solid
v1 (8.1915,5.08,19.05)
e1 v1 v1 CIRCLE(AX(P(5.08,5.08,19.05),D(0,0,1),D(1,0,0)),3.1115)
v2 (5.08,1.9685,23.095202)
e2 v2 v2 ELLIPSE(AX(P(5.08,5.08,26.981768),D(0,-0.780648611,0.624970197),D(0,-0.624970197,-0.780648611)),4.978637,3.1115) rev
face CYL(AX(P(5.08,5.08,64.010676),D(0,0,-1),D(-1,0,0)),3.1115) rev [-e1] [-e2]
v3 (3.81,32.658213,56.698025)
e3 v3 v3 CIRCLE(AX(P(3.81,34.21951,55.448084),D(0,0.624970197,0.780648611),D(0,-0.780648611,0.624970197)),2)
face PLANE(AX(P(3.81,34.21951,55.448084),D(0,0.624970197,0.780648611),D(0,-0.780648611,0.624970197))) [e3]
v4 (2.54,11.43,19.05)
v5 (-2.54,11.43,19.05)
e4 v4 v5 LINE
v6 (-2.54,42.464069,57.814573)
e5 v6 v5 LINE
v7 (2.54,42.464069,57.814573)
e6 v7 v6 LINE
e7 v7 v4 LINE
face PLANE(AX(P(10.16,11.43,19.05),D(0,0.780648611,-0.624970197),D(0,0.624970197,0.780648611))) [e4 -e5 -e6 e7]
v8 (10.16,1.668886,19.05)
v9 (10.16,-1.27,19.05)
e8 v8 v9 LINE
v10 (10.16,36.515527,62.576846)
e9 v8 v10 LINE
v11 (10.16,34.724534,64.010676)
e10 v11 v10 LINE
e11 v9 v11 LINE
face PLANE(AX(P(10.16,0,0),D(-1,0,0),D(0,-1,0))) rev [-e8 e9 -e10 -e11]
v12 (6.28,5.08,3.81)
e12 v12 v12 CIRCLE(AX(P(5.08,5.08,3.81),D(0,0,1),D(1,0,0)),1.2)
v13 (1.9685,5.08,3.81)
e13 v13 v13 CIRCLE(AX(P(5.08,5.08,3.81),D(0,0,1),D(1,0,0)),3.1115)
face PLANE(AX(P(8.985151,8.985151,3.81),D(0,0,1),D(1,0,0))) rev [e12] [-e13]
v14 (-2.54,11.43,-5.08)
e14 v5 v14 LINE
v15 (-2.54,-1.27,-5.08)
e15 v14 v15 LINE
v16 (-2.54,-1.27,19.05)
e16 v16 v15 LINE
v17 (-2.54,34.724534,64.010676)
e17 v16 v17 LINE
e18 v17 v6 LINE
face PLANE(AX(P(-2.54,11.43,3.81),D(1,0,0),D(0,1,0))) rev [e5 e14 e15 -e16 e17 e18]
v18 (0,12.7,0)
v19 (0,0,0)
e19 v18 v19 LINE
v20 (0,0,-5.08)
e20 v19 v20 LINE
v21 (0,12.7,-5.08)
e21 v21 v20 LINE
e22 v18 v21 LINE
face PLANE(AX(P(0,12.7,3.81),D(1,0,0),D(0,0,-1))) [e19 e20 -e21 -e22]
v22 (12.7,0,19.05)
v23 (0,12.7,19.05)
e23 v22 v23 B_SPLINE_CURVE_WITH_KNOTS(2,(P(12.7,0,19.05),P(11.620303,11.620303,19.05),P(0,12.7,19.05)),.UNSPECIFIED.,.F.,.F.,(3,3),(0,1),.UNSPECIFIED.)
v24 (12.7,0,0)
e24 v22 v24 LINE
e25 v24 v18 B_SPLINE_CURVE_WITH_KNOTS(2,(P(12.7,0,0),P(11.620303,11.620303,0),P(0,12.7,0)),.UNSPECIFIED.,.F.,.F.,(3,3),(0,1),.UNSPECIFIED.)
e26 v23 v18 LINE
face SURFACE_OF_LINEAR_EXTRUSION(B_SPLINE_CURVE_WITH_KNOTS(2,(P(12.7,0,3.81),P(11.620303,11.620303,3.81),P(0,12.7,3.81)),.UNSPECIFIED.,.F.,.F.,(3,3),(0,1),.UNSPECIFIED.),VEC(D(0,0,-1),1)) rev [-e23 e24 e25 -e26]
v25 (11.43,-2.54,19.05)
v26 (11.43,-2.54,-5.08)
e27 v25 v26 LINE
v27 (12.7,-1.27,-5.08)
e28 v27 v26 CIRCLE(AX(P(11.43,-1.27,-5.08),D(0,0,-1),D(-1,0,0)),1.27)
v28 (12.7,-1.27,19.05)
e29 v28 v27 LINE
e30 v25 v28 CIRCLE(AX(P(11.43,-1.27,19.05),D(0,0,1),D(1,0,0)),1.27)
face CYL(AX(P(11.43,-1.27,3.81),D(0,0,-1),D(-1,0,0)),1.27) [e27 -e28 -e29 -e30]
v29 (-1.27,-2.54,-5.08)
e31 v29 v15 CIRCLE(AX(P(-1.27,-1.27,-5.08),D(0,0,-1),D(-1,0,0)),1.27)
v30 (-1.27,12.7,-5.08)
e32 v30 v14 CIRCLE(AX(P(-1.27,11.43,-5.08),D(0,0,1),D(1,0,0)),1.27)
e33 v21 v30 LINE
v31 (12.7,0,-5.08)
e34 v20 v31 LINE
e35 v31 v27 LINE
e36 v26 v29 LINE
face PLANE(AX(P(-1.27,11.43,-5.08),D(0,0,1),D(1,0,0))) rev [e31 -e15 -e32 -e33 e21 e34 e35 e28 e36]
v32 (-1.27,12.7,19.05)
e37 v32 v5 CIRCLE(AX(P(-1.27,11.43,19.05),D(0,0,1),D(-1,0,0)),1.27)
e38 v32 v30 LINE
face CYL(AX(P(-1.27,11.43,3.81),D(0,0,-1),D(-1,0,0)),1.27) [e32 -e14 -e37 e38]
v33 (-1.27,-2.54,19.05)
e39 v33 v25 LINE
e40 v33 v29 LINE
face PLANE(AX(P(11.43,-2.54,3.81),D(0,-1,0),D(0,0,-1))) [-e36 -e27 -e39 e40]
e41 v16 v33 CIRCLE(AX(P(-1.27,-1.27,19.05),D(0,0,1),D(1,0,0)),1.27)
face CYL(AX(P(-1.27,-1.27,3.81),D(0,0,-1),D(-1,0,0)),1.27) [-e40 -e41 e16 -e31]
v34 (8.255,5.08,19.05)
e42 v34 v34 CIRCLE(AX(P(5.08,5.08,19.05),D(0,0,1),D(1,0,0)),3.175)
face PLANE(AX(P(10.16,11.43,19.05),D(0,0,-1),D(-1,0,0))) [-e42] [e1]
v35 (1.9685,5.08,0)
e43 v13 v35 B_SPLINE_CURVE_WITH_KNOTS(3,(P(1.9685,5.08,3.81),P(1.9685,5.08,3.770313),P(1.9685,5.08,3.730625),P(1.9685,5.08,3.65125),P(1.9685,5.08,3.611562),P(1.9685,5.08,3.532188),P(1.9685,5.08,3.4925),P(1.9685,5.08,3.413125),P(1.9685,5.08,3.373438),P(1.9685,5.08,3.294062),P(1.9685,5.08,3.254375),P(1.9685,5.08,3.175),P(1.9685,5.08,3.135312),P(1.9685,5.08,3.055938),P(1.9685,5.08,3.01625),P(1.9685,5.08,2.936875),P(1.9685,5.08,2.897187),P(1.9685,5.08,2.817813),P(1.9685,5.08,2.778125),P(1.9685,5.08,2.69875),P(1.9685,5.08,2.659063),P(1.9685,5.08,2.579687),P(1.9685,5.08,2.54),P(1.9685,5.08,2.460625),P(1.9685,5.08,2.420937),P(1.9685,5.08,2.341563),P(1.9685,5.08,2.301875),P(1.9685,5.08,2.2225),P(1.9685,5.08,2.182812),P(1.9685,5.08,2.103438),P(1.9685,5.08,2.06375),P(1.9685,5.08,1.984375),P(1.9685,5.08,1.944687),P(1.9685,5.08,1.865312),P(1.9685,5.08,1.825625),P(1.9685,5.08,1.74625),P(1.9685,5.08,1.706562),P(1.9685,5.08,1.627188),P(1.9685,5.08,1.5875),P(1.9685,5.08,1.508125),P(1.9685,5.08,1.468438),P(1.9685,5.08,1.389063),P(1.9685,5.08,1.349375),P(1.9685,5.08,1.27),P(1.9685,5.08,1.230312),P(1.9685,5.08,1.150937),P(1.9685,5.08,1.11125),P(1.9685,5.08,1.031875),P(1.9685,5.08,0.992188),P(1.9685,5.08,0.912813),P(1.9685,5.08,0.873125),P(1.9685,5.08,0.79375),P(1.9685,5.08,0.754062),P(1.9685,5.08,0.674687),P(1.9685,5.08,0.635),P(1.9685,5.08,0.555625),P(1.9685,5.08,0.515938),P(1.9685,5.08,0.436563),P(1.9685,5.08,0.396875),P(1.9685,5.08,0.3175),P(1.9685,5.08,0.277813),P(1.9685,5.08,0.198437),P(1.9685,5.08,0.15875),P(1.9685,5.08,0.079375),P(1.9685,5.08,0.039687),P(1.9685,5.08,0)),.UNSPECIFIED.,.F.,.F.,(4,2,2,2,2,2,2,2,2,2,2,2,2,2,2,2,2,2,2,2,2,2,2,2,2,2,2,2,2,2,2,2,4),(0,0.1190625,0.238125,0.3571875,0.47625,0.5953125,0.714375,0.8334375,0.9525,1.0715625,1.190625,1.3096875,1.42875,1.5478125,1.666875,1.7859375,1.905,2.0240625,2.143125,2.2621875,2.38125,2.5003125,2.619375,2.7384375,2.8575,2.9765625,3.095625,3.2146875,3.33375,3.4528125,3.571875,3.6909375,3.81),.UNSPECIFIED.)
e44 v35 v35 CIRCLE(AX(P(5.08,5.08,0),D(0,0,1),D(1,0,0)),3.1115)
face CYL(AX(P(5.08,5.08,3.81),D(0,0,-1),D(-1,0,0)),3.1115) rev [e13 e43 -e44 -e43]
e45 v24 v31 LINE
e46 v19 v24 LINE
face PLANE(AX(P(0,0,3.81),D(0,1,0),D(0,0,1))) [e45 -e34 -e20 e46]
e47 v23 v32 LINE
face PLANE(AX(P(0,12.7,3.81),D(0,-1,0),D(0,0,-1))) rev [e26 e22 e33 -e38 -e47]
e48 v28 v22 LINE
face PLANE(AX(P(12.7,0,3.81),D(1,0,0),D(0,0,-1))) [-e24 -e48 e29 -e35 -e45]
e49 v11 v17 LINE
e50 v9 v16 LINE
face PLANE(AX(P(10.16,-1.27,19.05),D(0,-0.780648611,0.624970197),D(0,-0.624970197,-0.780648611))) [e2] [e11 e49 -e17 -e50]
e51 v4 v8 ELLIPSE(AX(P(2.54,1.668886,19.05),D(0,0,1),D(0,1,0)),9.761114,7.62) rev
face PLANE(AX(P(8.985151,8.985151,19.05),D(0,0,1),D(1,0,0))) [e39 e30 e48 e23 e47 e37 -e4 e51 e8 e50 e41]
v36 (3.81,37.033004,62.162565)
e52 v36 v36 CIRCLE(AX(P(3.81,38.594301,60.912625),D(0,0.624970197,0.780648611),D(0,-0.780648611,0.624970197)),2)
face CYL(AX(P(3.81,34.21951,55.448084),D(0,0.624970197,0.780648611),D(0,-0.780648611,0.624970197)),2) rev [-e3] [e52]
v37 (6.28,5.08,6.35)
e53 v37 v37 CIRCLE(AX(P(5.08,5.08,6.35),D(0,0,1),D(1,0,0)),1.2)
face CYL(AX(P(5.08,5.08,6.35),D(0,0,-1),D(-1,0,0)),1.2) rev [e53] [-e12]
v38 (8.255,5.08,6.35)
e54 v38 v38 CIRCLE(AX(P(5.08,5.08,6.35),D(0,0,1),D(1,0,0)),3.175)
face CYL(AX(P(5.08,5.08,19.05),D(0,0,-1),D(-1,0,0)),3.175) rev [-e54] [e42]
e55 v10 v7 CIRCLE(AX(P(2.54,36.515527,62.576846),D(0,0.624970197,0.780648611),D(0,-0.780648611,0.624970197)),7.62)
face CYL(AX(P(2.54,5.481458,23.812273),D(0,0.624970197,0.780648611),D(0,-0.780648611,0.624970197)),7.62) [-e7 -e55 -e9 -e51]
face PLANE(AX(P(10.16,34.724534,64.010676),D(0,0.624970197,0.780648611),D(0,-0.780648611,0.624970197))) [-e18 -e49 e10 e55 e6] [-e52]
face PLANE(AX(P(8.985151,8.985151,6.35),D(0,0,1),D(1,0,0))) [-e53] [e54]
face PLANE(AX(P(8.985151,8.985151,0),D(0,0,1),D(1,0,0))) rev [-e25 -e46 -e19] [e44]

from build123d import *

# Parameters (mm, degrees)
SKETCH1_R                = 3.1115
BOSS_EXTRUDE1_DEPTH      = 3.81
BOSS_EXTRUDE2_DEPTH      = 5.08
BOSS_EXTRUDE2_DEPTH_BACK = 3.81
BOSS_EXTRUDE3_START      = 2.54
SKETCH3_R                = 1.2
BOSS_EXTRUDE3_DEPTH      = 2.54
BOSS_EXTRUDE4_START      = 12.7
SKETCH4_R                = 3.175
BOSS_EXTRUDE4_DEPTH      = 12.7
BOSS_EXTRUDE5_DEPTH      = 12.7
SKETCH7_R                = 3.1115
CUT_EXTRUDE1_DEPTH       = 64.134377028
SKETCH9_R                = 2.000000064
CUT_EXTRUDE2_DEPTH       = 6.99999997
FILLET1_R                = 7.62


with BuildPart() as part:
    # Sketch1 → Boss-Extrude1 (new body)
    with BuildSketch(Plane.XY):
        with BuildLine():
            Line((0, 0), (12.7, 0))
            add(Edge.make_bspline(
                [(0, 12.7), (11.620302725, 11.620302725), (12.7, 0)],
                knots=[0, 0, 0, 1, 1, 1], degree=2))
            Line((0, 12.7), (0, 0))
        make_face()
        with Locations(Location((5.08, 5.08, 0), (0, 0, 180))):
            Circle(SKETCH1_R, mode=Mode.SUBTRACT)
    extrude(amount=BOSS_EXTRUDE1_DEPTH)

    # Sketch2 → Boss-Extrude2 (add, two sides: drawn at the far end of the back side and taken through both)
    with BuildSketch(Plane(origin=(0, 0, 0), x_dir=(-1, 0, 0), z_dir=(0, 0, -1)).offset(-BOSS_EXTRUDE2_DEPTH_BACK)):
        with BuildLine():
            Line((0, 12.7), (1.27, 12.7))
            ThreePointArc((1.27, 12.7), (2.168025612, 12.328025612), (2.54, 11.43))
            Line((2.54, 11.43), (2.54, -1.27))
            ThreePointArc((2.54, -1.27), (2.168025612, -2.168025612), (1.27, -2.54))
            Line((1.27, -2.54), (-11.43, -2.54))
            ThreePointArc((-11.43, -2.54), (-12.328025612, -2.168025612), (-12.7, -1.27))
            Line((-12.7, -1.27), (-12.7, 0))
            Line((-12.7, 0), (0, 0))
            Line((0, 0), (0, 12.7))
        make_face()
    extrude(amount=BOSS_EXTRUDE2_DEPTH + BOSS_EXTRUDE2_DEPTH_BACK)

    # Sketch3 → Boss-Extrude3 (add)
    with BuildSketch(Plane.XY.offset(3.81).offset(BOSS_EXTRUDE3_START)):
        with BuildLine():
            Line((-2.54, 11.43), (-2.54, -1.27))
            ThreePointArc((-2.54, -1.27), (-2.168025612, -2.168025612), (-1.27, -2.54))
            Line((-1.27, -2.54), (11.43, -2.54))
            ThreePointArc((11.43, -2.54), (12.328025612, -2.168025612), (12.7, -1.27))
            Line((12.7, -1.27), (12.7, 0))
            add(Edge.make_bspline(
                [(0, 12.7), (11.620302725, 11.620302725), (12.7, 0)],
                knots=[0, 0, 0, 1, 1, 1], degree=2))
            Line((0, 12.7), (-1.27, 12.7))
            ThreePointArc((-1.27, 12.7), (-2.168025612, 12.328025612), (-2.54, 11.43))
        make_face()
        with Locations((5.08, 5.08)):
            Circle(SKETCH3_R, mode=Mode.SUBTRACT)
    extrude(amount=-BOSS_EXTRUDE3_DEPTH)

    # Sketch4 → Boss-Extrude4 (add)
    with BuildSketch(Plane.XY.offset(6.35).offset(BOSS_EXTRUDE4_START)):
        with BuildLine():
            Line((-2.54, 11.43), (-2.54, -1.27))
            ThreePointArc((-2.54, -1.27), (-2.168025612, -2.168025612), (-1.27, -2.54))
            Line((-1.27, -2.54), (11.43, -2.54))
            ThreePointArc((11.43, -2.54), (12.328025612, -2.168025612), (12.7, -1.27))
            Line((12.7, -1.27), (12.7, 0))
            add(Edge.make_bspline(
                [(0, 12.7), (11.620302725, 11.620302725), (12.7, 0)],
                knots=[0, 0, 0, 1, 1, 1], degree=2))
            Line((0, 12.7), (-1.27, 12.7))
            ThreePointArc((-1.27, 12.7), (-2.168025612, 12.328025612), (-2.54, 11.43))
        make_face()
        with Locations((5.08, 5.08)):
            Circle(SKETCH4_R, mode=Mode.SUBTRACT)
    extrude(amount=-BOSS_EXTRUDE4_DEPTH)

    # Sketch8 → Boss-Extrude5 (add)
    with BuildSketch(Plane.ZY.offset(2.54)):
        Polygon((19.05, 11.43), (19.05, -1.27), (64.010676082, 34.724533506), (57.814573212, 42.464069123), align=None)
    extrude(amount=-BOSS_EXTRUDE5_DEPTH)

    # Sketch7 → Cut-Extrude1 (cut, through all)
    with BuildSketch(Plane.XY.offset(19.05)):
        with Locations(Location((5.08, 5.08, 0), (0, 0, 180))):
            Circle(SKETCH7_R)
    extrude(amount=CUT_EXTRUDE1_DEPTH, mode=Mode.SUBTRACT)

    # Sketch9 → Cut-Extrude2 (cut)
    with BuildSketch(Plane(origin=(0, 44.792641372, 55.95036922), x_dir=(1, 0, 0), z_dir=(0, 0.624970196645459, 0.7806486106469008))):
        with Locations(Location((3.81, -7.939987304, 0), (0, 0, 270))):
            Circle(SKETCH9_R)
    extrude(amount=-CUT_EXTRUDE2_DEPTH, mode=Mode.SUBTRACT)

    # Fillet1
    # the kernel refuses this fillet: 7.62 mm, written as the material it takes off along each edge
    with BuildSketch(Plane(origin=(10.16, 54.369751369, 72.685929245), x_dir=(0, -0.7806486106469015, 0.6249701966454579), z_dir=(0, -0.6249701966454579, -0.7806486106469015))) as fillet1_piece_1_section:
        with BuildLine():
            CenterArc((FILLET1_R, FILLET1_R), FILLET1_R, 180, 90)
            Line((0, FILLET1_R), (0, 0))
            Line((0, 0), (FILLET1_R, 0))
        make_face()
    fillet1_piece_1 = extrude(amount=87.756878503, mode=Mode.PRIVATE)
    fillet1_piece_1 = split(fillet1_piece_1, bisect_by=Plane(origin=(8.453079593, 31.089805897, 19.05), z_dir=(0, 0, 1)), keep=Keep.TOP, mode=Mode.PRIVATE)
    add(fillet1_piece_1, mode=Mode.SUBTRACT)


solid = part.part
